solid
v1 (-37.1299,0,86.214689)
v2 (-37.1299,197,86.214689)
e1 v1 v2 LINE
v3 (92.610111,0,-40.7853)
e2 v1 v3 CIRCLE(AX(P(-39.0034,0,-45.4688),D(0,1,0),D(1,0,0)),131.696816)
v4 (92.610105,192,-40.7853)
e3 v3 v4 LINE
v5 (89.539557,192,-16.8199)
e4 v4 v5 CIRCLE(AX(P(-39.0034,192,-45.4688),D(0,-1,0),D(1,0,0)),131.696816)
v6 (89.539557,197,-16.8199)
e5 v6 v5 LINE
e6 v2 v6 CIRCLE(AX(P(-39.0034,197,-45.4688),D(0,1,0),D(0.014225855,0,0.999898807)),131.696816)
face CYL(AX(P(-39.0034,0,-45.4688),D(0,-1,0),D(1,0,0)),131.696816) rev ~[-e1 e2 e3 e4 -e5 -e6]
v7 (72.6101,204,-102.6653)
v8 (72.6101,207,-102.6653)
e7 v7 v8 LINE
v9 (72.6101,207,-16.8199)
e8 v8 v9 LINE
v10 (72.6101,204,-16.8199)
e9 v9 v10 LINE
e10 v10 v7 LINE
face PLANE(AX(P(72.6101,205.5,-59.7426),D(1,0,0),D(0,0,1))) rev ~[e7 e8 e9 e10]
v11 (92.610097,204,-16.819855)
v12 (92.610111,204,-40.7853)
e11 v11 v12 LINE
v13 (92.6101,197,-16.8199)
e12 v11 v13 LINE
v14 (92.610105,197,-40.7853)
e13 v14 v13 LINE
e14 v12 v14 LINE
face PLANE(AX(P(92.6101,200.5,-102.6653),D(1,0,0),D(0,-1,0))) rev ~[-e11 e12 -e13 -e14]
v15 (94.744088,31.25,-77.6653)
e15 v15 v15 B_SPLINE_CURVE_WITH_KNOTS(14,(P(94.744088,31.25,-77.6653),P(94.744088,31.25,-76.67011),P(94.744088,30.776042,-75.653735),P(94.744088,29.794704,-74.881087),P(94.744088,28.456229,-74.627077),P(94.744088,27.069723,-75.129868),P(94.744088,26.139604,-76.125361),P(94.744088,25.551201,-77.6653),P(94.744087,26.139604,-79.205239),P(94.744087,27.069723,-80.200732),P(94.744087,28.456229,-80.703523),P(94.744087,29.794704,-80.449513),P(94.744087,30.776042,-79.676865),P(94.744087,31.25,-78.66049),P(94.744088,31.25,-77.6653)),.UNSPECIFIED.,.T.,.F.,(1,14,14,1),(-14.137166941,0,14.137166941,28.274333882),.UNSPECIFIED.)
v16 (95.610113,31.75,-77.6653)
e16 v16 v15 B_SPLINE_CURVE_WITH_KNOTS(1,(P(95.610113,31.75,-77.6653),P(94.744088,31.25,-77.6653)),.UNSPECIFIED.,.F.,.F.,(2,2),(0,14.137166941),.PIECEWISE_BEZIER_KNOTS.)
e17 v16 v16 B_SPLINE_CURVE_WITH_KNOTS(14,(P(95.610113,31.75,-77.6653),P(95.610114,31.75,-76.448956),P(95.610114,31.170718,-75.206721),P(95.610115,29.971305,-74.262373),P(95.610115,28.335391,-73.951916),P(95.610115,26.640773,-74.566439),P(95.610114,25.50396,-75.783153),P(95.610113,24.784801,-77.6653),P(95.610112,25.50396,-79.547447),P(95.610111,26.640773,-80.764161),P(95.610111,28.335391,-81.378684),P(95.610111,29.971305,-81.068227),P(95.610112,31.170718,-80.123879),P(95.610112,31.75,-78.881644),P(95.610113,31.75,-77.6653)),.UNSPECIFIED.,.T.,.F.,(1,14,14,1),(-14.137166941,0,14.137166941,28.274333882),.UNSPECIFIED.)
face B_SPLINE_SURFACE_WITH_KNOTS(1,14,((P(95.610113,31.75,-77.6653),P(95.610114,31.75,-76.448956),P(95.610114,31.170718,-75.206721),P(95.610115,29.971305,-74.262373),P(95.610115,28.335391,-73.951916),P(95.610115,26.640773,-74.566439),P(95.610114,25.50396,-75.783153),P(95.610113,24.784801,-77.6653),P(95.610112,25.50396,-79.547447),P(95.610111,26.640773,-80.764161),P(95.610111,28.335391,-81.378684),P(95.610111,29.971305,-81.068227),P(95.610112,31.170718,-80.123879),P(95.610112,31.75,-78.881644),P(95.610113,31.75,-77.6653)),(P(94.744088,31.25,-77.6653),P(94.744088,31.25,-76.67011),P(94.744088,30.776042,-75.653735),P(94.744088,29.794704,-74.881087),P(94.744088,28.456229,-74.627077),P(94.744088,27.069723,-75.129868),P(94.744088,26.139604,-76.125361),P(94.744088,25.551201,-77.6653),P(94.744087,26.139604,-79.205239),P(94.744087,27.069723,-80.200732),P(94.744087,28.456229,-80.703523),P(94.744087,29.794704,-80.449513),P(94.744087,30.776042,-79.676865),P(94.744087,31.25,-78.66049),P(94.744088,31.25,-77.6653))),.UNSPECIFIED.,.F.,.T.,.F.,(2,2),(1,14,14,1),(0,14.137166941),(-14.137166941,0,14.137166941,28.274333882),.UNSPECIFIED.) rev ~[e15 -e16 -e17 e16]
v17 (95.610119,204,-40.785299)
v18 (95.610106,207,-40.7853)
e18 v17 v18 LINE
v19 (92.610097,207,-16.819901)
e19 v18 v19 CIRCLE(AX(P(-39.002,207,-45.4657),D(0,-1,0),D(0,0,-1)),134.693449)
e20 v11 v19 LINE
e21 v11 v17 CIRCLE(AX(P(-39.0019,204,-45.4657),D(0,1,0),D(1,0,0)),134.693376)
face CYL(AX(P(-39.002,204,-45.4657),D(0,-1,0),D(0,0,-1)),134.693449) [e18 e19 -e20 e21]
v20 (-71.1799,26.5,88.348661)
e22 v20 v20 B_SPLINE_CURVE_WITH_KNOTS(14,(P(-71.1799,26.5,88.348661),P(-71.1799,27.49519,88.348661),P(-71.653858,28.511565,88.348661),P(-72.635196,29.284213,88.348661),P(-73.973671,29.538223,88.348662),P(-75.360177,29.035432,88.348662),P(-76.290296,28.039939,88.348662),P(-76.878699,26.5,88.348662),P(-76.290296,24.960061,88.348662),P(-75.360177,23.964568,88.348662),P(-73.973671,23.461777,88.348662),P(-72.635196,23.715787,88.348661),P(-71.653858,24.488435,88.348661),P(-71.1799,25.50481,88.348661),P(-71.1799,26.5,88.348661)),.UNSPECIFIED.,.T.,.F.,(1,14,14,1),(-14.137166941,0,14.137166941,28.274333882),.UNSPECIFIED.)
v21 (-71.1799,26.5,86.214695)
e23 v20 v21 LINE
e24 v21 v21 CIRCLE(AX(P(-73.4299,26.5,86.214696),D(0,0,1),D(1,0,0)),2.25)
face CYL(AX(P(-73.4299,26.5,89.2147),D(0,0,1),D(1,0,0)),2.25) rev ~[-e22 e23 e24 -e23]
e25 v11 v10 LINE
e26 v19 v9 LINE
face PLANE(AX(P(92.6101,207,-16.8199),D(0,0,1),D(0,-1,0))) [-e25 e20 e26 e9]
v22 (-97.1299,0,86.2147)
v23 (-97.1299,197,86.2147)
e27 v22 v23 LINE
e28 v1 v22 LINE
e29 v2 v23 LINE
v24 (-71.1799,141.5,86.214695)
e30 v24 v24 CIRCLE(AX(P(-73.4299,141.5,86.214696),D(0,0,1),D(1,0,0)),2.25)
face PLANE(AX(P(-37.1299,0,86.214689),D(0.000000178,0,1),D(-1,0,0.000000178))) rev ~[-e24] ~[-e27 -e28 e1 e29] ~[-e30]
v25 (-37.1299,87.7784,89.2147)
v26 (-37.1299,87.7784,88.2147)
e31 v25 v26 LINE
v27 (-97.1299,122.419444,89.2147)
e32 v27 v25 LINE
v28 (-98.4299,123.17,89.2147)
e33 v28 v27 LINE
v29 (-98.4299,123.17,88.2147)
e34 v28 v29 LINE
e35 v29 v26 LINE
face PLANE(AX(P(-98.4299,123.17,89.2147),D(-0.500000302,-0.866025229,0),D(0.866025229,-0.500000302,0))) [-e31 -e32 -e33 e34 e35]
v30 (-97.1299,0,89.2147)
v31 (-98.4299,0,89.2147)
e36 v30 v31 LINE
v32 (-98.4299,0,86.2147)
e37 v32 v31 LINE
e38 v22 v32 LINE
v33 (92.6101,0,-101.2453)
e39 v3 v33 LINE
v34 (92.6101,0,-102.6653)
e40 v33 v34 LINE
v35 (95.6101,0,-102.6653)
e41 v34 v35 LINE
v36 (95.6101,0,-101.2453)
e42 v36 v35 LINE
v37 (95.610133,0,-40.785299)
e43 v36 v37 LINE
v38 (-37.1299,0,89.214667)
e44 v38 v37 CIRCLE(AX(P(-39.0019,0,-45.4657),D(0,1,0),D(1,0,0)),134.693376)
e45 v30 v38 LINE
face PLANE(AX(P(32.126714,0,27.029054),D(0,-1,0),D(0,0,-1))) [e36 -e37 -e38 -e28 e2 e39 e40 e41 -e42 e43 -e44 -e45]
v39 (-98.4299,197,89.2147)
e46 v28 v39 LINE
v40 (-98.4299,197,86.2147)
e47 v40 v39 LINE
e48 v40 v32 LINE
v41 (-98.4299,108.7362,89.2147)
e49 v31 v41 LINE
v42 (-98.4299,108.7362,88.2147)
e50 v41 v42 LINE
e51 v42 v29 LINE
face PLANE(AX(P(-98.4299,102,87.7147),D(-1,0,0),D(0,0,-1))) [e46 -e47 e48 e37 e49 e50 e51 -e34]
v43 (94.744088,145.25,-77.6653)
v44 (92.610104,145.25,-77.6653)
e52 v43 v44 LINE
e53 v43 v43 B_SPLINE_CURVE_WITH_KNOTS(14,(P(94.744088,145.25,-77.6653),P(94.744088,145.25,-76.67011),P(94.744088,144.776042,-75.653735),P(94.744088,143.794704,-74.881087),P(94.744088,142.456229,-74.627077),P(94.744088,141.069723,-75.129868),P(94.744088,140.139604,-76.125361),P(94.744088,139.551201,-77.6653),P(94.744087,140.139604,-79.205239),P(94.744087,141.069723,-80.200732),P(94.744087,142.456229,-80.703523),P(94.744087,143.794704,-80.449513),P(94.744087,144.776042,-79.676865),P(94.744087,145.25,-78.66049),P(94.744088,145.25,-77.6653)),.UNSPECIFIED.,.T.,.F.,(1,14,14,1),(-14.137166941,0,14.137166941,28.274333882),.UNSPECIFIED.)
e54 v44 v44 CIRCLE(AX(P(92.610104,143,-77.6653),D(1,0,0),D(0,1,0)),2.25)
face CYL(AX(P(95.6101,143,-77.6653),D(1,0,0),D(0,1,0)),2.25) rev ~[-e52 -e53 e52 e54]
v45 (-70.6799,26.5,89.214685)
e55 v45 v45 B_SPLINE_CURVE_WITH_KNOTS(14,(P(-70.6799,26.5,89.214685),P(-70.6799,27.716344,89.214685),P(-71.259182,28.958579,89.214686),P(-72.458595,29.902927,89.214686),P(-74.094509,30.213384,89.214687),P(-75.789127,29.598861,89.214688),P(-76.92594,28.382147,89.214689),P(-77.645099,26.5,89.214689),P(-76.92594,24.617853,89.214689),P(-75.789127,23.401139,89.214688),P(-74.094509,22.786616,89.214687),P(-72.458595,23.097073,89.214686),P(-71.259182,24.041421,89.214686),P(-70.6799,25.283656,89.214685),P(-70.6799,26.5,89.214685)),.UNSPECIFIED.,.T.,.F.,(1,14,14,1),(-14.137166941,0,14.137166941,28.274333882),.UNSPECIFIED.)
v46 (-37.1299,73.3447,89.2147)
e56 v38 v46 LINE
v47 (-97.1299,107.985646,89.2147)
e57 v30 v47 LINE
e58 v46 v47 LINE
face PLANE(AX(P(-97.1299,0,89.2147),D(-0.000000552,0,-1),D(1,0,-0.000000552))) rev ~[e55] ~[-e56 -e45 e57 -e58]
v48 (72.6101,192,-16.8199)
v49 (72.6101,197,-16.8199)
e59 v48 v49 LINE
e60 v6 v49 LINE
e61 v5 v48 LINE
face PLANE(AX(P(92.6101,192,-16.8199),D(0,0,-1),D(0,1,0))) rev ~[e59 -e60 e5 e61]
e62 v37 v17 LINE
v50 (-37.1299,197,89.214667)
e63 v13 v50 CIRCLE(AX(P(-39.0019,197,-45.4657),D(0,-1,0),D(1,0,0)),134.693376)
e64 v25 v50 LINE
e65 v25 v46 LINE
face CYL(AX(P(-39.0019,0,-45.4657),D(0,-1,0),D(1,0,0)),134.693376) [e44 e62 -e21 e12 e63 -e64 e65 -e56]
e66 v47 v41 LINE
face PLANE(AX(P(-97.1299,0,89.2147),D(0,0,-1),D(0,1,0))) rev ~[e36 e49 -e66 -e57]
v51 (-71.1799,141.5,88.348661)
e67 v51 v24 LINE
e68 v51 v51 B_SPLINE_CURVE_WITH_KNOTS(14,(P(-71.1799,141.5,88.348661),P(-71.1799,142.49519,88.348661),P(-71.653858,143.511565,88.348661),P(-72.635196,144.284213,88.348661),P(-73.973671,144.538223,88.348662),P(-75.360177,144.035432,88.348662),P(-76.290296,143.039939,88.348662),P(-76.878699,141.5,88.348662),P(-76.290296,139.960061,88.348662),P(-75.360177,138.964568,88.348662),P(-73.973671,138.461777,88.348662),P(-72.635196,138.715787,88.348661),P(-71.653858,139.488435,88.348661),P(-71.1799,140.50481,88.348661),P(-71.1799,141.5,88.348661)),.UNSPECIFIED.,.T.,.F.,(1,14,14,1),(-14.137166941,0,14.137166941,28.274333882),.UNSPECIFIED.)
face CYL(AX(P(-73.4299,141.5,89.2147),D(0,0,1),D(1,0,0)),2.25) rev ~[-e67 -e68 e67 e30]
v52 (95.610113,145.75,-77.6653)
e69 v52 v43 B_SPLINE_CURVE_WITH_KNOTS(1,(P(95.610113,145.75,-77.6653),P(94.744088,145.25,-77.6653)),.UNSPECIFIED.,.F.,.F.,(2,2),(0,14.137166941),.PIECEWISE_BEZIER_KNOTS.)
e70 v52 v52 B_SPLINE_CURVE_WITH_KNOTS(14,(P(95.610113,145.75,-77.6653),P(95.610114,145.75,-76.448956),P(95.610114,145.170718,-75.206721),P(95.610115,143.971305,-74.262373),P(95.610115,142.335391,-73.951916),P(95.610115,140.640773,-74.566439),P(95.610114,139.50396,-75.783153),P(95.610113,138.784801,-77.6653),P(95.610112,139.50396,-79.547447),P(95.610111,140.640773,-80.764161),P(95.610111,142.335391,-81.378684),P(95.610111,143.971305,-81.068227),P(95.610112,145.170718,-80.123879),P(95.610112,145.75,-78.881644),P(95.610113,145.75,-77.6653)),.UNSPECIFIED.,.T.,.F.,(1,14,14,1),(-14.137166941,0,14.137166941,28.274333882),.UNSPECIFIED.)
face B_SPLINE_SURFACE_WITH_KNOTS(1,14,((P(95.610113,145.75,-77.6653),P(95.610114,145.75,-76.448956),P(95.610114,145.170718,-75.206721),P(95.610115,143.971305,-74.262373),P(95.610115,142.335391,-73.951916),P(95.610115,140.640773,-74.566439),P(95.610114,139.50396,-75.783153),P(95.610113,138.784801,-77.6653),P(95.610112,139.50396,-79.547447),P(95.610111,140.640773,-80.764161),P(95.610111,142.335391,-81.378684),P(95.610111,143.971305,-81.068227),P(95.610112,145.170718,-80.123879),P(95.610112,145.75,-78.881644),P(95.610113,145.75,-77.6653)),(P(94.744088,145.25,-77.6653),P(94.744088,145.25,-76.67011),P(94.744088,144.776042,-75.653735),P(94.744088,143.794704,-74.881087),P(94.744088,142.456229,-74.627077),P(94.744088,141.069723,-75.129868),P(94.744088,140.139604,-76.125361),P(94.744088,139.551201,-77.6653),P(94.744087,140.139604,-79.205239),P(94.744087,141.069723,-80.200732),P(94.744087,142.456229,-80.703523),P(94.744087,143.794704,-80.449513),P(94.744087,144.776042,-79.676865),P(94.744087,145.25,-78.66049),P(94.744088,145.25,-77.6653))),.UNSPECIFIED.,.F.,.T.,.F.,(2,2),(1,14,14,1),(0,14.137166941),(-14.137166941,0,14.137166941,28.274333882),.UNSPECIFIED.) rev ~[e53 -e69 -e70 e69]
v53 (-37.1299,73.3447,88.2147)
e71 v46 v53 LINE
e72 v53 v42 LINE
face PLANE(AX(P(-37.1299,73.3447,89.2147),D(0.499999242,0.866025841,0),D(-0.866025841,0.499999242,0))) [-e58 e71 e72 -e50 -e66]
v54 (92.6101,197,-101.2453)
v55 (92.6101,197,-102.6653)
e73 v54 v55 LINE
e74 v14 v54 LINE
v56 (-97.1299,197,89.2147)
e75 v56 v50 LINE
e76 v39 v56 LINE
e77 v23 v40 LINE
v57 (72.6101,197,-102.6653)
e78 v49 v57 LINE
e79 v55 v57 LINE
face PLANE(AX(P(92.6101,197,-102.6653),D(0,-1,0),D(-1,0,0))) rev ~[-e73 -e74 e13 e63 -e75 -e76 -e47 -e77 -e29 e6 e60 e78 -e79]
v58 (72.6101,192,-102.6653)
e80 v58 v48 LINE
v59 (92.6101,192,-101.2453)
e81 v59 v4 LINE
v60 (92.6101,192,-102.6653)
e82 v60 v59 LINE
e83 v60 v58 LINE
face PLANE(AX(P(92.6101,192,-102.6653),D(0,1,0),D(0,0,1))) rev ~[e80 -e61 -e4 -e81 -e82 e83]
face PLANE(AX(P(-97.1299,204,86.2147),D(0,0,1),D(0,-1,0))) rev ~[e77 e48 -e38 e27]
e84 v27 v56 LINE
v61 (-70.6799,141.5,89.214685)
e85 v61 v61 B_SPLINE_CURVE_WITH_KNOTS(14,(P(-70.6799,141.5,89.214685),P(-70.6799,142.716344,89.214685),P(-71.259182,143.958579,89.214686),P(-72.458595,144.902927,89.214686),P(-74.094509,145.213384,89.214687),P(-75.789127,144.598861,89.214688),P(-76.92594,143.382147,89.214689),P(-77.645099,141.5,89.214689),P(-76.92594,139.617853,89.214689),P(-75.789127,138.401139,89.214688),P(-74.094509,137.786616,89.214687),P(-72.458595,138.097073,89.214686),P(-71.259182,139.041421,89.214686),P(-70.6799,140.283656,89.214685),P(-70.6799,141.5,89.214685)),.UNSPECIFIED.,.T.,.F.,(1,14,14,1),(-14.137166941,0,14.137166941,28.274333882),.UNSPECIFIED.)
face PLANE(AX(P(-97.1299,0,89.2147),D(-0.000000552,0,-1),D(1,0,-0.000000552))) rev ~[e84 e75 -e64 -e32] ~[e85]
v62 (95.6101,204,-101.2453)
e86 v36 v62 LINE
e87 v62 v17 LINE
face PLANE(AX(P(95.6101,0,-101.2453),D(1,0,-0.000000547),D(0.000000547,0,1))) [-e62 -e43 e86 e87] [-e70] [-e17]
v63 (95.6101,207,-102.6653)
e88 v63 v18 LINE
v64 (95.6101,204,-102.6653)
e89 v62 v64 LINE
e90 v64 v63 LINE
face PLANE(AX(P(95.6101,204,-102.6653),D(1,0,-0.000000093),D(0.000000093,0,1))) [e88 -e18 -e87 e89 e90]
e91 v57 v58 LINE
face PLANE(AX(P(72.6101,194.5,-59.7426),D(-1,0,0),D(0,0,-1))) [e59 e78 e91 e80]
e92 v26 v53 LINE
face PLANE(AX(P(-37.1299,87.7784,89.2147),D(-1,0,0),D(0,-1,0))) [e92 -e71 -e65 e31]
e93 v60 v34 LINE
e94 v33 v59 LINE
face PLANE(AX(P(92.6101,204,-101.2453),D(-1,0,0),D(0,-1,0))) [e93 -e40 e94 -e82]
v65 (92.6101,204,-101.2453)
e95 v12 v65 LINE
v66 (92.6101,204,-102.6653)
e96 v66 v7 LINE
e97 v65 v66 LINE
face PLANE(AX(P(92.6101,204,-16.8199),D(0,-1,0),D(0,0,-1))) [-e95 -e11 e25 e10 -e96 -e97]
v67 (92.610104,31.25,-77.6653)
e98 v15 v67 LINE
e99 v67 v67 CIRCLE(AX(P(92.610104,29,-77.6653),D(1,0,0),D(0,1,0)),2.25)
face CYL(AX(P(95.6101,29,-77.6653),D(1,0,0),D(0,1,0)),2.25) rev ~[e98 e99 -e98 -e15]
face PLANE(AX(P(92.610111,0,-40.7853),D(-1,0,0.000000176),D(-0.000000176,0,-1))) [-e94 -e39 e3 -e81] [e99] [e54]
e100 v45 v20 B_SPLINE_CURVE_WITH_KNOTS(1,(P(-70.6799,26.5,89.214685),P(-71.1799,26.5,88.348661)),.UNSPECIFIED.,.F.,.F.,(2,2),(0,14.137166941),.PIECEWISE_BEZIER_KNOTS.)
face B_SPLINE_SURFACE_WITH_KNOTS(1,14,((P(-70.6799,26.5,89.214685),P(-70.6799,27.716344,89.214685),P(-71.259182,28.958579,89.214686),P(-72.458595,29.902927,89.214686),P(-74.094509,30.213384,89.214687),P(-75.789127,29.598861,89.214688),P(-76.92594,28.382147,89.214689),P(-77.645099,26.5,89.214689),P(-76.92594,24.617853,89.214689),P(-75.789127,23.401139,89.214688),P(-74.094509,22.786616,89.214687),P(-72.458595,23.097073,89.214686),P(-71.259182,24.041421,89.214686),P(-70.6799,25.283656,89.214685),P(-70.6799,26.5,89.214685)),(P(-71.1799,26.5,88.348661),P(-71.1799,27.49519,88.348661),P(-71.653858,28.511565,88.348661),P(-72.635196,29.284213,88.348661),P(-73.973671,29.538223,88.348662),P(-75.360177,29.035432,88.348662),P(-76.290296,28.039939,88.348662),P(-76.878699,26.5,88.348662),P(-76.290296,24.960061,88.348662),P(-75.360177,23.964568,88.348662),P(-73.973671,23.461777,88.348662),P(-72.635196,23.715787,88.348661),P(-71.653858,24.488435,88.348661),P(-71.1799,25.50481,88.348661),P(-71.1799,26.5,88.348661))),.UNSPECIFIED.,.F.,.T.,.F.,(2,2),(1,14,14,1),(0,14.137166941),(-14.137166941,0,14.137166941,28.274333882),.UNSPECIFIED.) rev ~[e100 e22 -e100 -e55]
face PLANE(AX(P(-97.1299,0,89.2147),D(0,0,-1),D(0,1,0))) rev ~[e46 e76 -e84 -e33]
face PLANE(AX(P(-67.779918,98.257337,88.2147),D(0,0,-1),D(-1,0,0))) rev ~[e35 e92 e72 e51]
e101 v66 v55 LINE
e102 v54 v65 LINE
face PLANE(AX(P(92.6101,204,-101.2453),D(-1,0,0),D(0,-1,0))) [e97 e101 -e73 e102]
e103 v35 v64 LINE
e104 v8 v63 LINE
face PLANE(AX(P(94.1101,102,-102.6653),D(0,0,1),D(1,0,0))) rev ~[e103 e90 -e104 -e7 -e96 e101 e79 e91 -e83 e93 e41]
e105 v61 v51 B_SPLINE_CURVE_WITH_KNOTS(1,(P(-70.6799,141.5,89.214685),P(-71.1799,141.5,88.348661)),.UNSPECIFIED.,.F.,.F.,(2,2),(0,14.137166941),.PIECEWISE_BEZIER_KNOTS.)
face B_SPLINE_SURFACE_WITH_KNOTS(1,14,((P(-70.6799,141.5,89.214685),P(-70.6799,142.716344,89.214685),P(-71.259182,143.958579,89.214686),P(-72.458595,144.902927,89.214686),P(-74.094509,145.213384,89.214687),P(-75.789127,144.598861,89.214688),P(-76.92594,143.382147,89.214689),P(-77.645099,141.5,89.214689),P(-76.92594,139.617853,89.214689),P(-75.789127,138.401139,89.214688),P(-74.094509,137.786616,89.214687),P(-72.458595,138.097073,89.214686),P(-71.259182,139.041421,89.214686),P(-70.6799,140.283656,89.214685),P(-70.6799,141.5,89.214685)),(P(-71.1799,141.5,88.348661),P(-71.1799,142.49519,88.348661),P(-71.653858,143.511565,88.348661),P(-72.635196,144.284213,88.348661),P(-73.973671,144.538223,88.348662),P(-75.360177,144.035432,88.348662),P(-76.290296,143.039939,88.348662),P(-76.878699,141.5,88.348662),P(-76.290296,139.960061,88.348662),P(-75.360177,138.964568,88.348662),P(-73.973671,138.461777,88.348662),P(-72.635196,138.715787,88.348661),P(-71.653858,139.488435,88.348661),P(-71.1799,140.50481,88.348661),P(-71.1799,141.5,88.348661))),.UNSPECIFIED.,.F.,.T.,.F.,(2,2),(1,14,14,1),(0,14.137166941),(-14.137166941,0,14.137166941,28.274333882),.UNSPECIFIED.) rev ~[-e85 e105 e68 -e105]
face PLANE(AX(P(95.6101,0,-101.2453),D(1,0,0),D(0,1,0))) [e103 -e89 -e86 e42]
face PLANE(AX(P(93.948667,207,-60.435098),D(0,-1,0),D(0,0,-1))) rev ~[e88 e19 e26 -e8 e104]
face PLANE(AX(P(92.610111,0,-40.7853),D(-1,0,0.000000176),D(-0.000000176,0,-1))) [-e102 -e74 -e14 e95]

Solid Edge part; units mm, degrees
sketch "Sketch1" plane through (0, 0, 0) normal (0, -1, 0) x (1, 0, 0)
  arc A0 (-37.1299, 86.2147) -> (92.6101, -40.7853) centre (-39.0034, -45.4688) cw
  line L0 (92.6101, -40.7853) -> (92.6101, -101.2453)
  line L1 (92.6101, -101.2453) -> (95.6101, -101.2453)
  line L2 (95.6101, -101.2453) -> (95.6101, -40.7853)
  arc A1 (-37.1299, 89.2147) -> (95.6101, -40.7853) centre (-39.0019, -45.4657) cw
  line L3 (-97.1299, 89.2147) -> (-37.1299, 89.2147)
  line L4 (-97.1299, 86.2147) -> (-97.1299, 89.2147)
  line L5 (-37.1299, 86.2147) -> (-97.1299, 86.2147)
  dimension "D1" = 129.74
  dimension "D2" = 127
  dimension "D3" = 60
  dimension "D4" = 60.46
  dimension "D5" = 3
  dimension "D6" = 3
  dimension "D7" = 3
extrude "Protrusion1" add sketch "Sketch1" against normal blind 204
sketch "Sketch2" plane through (-67.1299, 85, 89.2147) normal (0, 0, 1) x (1, 0, 0)
  circle A0 centre (-6.3, -58.5) radius 2.25
  circle A1 centre (-6.3, 56.5) radius 2.25
  dimension "D1" = 23.7
  dimension "D2" = 4.5
  dimension "D3" = 115
  dimension "D4" = 26.5
extrude "Cutout1" cut sketch "Sketch2" against normal through all
sketch "Sketch3" plane through (95.6101, 85, -66.0153) normal (1, 0, 0) x (0, 1, 0)
  circle A0 centre (58, -11.65) radius 2.25
  circle A1 centre (-56, -11.65) radius 2.25
  dimension "D1" = 114
  dimension "D2" = 4.5
  dimension "D3" = 4.5
  dimension "D4" = 23.58
  dimension "D5" = 73
extrude "Cutout2" cut sketch "Sketch3" against normal through all
sketch "Sketch4" plane through (-97.1299, 102, 87.7147) normal (-1, 0, 0) x (0, -1, 0)
  line L0 (-102, -1.5) -> (102, -1.5)
  line L1 (102, -1.5) -> (102, 1.5)
  line L2 (102, 1.5) -> (-102, 1.5)
  line L3 (-102, 1.5) -> (-102, -1.5)
extrude "Extrusionsausprägung_3" add sketch "Sketch4" along normal blind 1.3
sketch "Sketch5" plane through (94.1101, 102, -101.2453) normal (0, 0, -1) x (0, 1, 0)
  line L0 (-102, 1.5) -> (102, 1.5)
  line L1 (102, 1.5) -> (102, -1.5)
  line L2 (102, -1.5) -> (-102, -1.5)
  line L3 (-102, -1.5) -> (-102, 1.5)
extrude "Extrusionsausprägung_4" add sketch "Sketch5" along normal blind 1.42
sketch "Sketch6" plane through (-67.7799, 102, 89.2147) normal (0, 0, 1) x (0, 1, 0)
  line L0 (21.17, 30.65) -> (-14.2216, -30.65)
  line L1 (-14.2216, -30.65) -> (-28.6553, -30.65)
  line L2 (-28.6553, -30.65) -> (6.7362, 30.65)
  line L3 (6.7362, 30.65) -> (21.17, 30.65)
  dimension "D1" = 12.5
  dimension "D2" = 80.83
extrude "Extrusionsausschnitt_3" cut sketch "Sketch6" against normal blind 1
chamfer "Fase_1" distance 0.5 angle 60 4 edges at (-75.6799, 26.5, 89.2147) (-75.6799, 141.5, 89.2147) (95.6101, 26.75, -77.6653) (95.6101, 140.75, -77.6653) measured on face at (-87.7299, 88.9082, 89.2147) measured on face at (-87.7299, 183.4675, 89.2147) measured on face at (-87.7299, 88.9082, 89.2147) measured on face at (-87.7299, 183.4675, 89.2147) measured on face at (95.6101, 167.96, -91.7732)
sketch "Sketch7" plane through (-67.7799, 145.8892, 89.2147) normal (0, 0, 1) x (-1, 0, 0)
  line L0 (30.65, -58.1108) -> (-160.39, -58.1108)
  line L1 (-160.39, -58.1108) -> (-160.39, -53.1108)
  line L2 (-160.39, -53.1108) -> (30.65, -53.1108)
  line L3 (30.65, -53.1108) -> (30.65, -58.1108)
  dimension "D1" = 5
  dimension "D2" = 191.04
extrude "Cutout3" cut sketch "Sketch7" against normal up to next
sketch "Sketch8" plane through (94.1101, 204, -59.7426) normal (0, 1, 0) x (0, 0, -1)
  line L0 (-42.9227, 1.5) -> (42.9227, 1.5)
  line L1 (42.9227, 1.5) -> (42.9227, -1.5)
  line L2 (42.9227, -1.5) -> (-18.9573, -1.5)
  arc A0 (-18.9573, -1.5) -> (-42.9227, 1.5) centre (-14.2769, 133.1121) cw
extrude "Extrusionsausprägung_7" add sketch "Sketch8" along normal blind 3
sketch "Sketch9" plane through (92.6101, 103.5, -59.7426) normal (-1, 0, 0) x (0, -1, 0)
  line L0 (-88.5, 42.9227) -> (-93.5, 42.9227)
  line L1 (-93.5, 42.9227) -> (-93.5, -42.9227)
  line L2 (-93.5, -42.9227) -> (-88.5, -42.9227)
  line L3 (-88.5, -42.9227) -> (-88.5, 42.9227)
  line L4 (-103.5, 42.9227) -> (-100.5, 42.9227)
  line L5 (-100.5, 42.9227) -> (-100.5, -42.9227)
  line L6 (-100.5, -42.9227) -> (-103.5, -42.9227)
  line L7 (-103.5, -42.9227) -> (-103.5, 42.9227)
  dimension "D1" = 3
  dimension "D2" = 5
  dimension "D3" = 7
  dimension "D4" = 85.8453
extrude "Extrusionsausprägung_8" add sketch "Sketch9" along normal blind 20
sketch "Sketch10" plane through (84.1101, 103.5, -102.6653) normal (0, 0, -1) x (0, 1, 0)
  line L0 (93.5, 8.5) -> (93.5, -182.54)
  line L1 (93.5, -182.54) -> (97, -182.54)
  line L2 (97, -182.54) -> (97, 8.5)
  line L3 (97, 8.5) -> (93.5, 8.5)
extrude "Cutout4" cut sketch "Sketch10" against normal up to next
properties material "Nylon, allgemein"
